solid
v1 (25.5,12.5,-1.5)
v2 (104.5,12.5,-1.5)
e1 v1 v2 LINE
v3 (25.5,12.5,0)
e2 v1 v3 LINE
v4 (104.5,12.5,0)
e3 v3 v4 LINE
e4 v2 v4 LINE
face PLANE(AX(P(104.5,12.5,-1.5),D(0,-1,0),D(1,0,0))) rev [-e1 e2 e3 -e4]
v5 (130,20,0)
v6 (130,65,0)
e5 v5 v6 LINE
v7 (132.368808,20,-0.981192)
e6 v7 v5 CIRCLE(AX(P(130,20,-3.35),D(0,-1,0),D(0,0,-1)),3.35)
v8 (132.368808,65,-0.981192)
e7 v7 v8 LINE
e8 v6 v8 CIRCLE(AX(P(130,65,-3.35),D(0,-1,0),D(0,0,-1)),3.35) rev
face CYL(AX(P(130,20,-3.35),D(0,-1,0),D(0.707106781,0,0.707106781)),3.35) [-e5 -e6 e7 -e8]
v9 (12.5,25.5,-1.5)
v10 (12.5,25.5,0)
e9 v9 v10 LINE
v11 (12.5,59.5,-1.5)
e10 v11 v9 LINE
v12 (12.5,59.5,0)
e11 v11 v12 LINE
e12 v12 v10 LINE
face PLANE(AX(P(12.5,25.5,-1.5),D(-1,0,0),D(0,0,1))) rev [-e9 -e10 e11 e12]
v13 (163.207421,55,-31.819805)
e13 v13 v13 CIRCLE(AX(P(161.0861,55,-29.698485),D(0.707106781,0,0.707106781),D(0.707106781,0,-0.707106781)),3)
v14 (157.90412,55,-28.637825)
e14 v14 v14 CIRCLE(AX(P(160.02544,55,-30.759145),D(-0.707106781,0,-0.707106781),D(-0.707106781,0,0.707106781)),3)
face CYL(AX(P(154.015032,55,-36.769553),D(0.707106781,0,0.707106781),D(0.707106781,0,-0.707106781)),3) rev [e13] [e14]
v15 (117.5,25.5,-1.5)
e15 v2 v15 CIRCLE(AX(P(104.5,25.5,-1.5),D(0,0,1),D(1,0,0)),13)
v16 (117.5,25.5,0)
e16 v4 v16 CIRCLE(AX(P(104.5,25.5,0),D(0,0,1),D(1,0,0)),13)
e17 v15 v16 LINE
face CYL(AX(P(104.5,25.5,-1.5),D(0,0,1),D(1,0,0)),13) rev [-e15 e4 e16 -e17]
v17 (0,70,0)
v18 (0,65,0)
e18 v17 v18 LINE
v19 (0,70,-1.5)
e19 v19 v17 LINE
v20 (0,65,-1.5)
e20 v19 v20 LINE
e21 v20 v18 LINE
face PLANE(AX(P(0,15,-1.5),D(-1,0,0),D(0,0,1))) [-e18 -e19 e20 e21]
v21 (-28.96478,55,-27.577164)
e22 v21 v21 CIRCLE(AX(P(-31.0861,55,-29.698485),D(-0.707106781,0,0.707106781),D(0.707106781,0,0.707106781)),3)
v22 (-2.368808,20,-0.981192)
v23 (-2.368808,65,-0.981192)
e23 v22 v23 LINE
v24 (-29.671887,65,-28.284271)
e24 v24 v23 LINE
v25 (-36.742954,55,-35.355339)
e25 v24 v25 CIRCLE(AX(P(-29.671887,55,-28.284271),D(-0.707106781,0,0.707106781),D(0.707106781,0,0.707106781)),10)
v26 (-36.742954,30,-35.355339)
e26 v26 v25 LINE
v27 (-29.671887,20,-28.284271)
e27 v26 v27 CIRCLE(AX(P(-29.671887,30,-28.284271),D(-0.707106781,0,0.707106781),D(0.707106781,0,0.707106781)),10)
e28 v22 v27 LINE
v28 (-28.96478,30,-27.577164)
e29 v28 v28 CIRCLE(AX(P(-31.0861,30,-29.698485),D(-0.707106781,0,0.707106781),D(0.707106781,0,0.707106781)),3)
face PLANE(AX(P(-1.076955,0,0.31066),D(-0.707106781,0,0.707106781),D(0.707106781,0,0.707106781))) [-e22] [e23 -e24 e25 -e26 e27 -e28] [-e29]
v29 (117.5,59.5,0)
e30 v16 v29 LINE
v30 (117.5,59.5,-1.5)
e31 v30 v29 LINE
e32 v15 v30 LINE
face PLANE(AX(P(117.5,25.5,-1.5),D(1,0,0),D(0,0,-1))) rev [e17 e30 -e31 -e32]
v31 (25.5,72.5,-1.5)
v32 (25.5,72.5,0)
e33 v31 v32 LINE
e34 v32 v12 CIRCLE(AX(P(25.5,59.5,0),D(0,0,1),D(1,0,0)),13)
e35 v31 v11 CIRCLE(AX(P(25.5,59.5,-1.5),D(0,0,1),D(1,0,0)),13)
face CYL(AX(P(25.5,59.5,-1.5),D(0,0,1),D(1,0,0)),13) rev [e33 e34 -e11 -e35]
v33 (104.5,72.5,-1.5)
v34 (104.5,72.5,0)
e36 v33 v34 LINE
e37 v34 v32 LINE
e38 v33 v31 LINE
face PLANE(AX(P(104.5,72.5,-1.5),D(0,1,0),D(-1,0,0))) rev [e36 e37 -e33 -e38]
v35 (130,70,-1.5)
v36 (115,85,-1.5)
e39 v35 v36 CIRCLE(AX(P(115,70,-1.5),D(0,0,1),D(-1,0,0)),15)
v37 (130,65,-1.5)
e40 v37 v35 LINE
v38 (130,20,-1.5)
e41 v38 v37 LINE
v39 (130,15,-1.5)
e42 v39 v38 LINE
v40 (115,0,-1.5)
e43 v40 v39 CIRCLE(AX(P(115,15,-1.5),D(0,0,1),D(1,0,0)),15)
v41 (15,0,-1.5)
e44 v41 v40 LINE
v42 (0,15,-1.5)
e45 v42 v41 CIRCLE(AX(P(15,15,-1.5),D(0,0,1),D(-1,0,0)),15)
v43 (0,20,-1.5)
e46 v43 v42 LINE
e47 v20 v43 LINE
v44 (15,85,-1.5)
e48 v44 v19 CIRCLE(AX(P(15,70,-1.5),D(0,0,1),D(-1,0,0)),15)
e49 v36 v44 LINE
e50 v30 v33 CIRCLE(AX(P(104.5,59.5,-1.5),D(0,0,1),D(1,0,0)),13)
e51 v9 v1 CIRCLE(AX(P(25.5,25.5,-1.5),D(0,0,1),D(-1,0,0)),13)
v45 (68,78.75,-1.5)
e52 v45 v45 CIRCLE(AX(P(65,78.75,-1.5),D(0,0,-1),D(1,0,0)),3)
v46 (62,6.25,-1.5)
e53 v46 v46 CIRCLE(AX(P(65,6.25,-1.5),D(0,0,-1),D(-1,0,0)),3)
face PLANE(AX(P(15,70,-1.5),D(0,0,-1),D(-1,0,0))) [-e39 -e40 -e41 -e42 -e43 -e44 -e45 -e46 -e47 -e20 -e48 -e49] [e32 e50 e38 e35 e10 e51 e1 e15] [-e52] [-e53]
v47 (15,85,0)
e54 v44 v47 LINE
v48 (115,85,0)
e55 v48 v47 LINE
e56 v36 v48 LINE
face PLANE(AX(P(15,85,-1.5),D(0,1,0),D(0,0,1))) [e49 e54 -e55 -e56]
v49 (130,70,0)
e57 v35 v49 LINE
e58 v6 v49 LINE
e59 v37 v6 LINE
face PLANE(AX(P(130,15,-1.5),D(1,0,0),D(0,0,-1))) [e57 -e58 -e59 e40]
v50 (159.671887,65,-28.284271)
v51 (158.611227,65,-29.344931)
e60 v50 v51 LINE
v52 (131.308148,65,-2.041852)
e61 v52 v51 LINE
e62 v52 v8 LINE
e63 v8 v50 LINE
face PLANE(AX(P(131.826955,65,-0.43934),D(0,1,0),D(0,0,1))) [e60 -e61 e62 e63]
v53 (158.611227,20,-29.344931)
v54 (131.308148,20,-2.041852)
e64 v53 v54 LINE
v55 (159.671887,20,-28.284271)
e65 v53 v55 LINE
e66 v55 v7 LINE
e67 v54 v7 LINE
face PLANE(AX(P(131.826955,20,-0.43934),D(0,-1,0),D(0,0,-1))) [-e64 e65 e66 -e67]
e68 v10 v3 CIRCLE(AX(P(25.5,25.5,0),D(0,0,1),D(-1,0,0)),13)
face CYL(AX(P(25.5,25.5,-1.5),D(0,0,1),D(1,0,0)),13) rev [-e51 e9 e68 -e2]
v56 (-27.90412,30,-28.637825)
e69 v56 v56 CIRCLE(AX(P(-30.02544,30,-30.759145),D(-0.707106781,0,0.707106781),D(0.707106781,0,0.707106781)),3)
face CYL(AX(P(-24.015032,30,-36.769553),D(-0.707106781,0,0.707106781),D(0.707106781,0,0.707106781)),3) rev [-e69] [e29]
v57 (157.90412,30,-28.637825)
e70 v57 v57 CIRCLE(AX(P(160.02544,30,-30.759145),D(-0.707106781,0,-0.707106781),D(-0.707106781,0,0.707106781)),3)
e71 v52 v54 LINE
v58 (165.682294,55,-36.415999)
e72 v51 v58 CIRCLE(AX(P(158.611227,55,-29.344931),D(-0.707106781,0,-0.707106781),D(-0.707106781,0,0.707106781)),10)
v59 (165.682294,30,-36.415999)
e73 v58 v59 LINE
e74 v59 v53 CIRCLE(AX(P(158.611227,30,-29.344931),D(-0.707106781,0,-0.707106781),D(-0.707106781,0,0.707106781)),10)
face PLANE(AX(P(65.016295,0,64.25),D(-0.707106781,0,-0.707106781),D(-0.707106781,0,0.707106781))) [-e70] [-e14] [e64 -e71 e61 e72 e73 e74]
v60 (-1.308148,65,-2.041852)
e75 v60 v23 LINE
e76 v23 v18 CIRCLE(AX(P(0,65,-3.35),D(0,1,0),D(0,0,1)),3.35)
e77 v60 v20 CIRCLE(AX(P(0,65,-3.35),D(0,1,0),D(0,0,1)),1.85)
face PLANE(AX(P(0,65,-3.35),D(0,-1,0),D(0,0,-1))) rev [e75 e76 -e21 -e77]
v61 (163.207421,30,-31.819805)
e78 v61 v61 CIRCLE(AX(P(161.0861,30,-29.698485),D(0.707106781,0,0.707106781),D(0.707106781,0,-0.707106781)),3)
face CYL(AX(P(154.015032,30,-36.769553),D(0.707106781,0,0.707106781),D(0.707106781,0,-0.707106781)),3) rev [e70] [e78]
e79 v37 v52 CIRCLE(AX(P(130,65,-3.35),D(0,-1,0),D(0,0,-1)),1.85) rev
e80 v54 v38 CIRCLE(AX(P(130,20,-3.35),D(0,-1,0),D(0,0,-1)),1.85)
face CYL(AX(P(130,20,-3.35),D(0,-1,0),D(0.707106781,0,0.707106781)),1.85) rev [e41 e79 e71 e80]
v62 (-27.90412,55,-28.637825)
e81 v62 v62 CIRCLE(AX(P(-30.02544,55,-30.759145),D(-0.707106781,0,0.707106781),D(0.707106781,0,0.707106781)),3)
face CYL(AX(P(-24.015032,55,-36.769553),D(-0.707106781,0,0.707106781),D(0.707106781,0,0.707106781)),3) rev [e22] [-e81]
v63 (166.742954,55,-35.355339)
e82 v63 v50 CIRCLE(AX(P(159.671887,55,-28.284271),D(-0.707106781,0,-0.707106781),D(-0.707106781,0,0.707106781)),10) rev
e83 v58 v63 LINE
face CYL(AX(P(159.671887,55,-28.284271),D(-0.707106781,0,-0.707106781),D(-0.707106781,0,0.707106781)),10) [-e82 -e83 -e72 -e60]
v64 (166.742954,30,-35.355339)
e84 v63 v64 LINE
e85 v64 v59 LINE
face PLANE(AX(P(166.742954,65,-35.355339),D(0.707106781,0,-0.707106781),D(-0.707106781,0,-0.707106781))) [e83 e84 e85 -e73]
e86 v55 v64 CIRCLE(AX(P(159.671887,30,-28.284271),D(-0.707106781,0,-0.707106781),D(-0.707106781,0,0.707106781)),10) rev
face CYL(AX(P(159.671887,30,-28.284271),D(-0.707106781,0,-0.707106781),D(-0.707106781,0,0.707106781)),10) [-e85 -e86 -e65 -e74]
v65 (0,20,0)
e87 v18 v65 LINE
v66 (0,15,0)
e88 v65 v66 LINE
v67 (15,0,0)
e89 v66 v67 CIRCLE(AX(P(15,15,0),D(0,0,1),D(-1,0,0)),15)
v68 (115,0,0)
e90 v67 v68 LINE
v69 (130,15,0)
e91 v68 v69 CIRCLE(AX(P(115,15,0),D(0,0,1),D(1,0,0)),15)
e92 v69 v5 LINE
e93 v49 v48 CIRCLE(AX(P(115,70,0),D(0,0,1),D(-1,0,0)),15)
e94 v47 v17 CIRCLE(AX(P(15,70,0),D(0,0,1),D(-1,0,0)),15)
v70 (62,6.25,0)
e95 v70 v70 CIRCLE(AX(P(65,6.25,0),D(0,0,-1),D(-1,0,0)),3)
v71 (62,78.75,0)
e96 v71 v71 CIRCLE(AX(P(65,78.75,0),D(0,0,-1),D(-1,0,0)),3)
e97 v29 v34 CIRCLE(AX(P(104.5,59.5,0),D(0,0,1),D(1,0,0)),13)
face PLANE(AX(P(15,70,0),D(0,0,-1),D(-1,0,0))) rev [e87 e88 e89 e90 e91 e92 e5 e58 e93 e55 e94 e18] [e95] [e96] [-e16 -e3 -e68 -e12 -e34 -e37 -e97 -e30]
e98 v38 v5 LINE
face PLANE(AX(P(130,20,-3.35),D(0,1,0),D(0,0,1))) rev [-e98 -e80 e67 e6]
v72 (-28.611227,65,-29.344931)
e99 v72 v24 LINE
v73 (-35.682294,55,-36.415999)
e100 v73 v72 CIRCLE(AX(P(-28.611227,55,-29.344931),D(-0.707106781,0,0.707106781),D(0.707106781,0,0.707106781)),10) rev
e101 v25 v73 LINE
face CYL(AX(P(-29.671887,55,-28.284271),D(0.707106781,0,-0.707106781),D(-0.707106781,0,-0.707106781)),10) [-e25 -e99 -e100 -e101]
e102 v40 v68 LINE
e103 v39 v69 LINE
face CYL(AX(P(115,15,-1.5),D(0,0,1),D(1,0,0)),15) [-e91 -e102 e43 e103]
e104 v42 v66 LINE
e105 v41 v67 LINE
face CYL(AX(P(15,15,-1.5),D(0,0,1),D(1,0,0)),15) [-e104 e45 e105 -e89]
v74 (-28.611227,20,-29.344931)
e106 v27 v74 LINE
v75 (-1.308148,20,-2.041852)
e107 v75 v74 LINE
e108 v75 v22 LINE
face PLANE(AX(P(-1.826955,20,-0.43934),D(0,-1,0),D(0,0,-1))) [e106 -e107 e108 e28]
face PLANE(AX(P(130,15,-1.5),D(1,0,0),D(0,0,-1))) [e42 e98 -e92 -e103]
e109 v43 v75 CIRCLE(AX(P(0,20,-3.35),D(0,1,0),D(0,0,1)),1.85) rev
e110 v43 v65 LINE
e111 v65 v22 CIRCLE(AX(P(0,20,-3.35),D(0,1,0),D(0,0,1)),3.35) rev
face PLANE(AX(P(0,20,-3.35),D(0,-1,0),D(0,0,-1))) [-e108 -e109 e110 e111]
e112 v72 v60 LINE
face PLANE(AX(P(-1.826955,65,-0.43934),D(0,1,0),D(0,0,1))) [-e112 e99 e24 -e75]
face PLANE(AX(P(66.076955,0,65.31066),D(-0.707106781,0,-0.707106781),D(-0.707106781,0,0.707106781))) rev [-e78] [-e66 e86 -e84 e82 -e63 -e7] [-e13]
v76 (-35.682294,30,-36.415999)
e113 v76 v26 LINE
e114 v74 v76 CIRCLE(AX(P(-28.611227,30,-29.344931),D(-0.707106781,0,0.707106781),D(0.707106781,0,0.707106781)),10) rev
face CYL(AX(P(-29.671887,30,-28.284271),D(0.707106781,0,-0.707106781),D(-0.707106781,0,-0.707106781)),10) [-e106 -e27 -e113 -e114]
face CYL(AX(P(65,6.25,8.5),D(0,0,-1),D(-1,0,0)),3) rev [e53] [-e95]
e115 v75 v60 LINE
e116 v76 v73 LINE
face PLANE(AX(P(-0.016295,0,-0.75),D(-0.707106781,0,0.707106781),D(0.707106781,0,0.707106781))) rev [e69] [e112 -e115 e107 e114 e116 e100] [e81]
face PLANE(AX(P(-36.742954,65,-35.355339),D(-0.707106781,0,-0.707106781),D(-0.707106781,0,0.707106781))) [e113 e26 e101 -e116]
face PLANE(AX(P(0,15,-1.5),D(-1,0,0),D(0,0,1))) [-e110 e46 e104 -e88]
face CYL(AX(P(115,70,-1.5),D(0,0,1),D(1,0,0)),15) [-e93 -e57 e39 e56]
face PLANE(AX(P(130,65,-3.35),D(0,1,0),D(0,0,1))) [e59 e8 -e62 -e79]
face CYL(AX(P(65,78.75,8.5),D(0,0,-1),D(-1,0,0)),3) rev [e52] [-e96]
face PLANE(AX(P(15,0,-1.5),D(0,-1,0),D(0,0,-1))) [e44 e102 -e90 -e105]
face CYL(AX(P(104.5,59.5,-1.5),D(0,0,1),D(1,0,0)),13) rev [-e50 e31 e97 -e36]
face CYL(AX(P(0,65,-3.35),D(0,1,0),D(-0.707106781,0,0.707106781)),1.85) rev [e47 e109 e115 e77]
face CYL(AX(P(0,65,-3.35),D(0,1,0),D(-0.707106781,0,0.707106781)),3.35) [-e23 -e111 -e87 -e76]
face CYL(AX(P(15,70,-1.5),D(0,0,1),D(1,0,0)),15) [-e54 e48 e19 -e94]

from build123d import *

# Parameters (mm, degrees)
BASE_FLANGE1_DEPTH          = 1.5
SM_EDGE_FLANGE_1_DEPTH      = 45
SM_EDGE_FLANGE_1_BEND_DEPTH = 45
SKETCH12_R                  = 3
CUT_EXTRUDE1_DEPTH          = 10
FILLET1_R                   = 10
SKETCH13_R                  = 3
CUT_EXTRUDE2_DEPTH          = 10
SKETCH14_R                  = 3
CUT_EXTRUDE3_DEPTH          = 10


# Sheet-metal steps are written as plain solids
with BuildPart() as part:
    # Sketch1 → Base-Flange1 (new body)
    with BuildSketch(Plane.XY):
        with BuildLine():
            Line((15, 0), (115, 0))
            ThreePointArc((115, 0), (125.606601718, 4.393398282), (130, 15))
            Line((130, 15), (130, 70))
            ThreePointArc((130, 70), (125.606601718, 80.606601718), (115, 85))
            Line((115, 85), (15, 85))
            ThreePointArc((15, 85), (4.393398282, 80.606601718), (0, 70))
            Line((0, 70), (0, 15))
            ThreePointArc((0, 15), (4.393398282, 4.393398282), (15, 0))
        make_face()
        with BuildLine():
            Line((104.5, 12.5), (25.5, 12.5))
            ThreePointArc((25.5, 12.5), (16.307611845, 16.307611845), (12.5, 25.5))
            Line((12.5, 25.5), (12.5, 59.5))
            ThreePointArc((12.5, 59.5), (16.307611845, 68.692388155), (25.5, 72.5))
            Line((25.5, 72.5), (104.5, 72.5))
            ThreePointArc((104.5, 72.5), (113.692388155, 68.692388155), (117.5, 59.5))
            Line((117.5, 59.5), (117.5, 25.5))
            ThreePointArc((117.5, 25.5), (113.692388155, 16.307611845), (104.5, 12.5))
        make_face(mode=Mode.SUBTRACT)
    extrude(amount=-BASE_FLANGE1_DEPTH)

    # Ребро-кромка1 section (across the edge) → Ребро-кромка1 (add)
    with BuildSketch(Plane(origin=(-0.76629509, 20, -1.5), x_dir=(0.7071067811865438, 0, -0.7071067811865512), z_dir=(0, 1, 0))):
        with BuildLine():
            Line((-1.5, 0.76629509), (-1.5, 49.378679656))
            Line((-1.5, 49.378679656), (0, 49.378679656))
            Line((0, 49.378679656), (0, 0.76629509))
            ThreePointArc((0, 0.76629509), (0.140822865, 0.058330741), (0.541852455, -0.541852455))
            Line((0.541852455, -0.541852455), (-0.518807717, -1.602512627))
            ThreePointArc((-0.518807717, -1.602512627), (-1.244996434, -0.515694408), (-1.5, 0.76629509))
        make_face()
    extrude(amount=SM_EDGE_FLANGE_1_DEPTH)

    # Ребро-кромка1 section 2 (across the edge) → Ребро-кромка1 bend (add)
    with BuildSketch(Plane(origin=(130.76629509, 65, -1.5), x_dir=(-0.7071067811865438, 0, -0.7071067811865512), z_dir=(0, -1, 0))):
        with BuildLine():
            Line((-1.5, 0.76629509), (-1.5, 49.378679656))
            Line((-1.5, 49.378679656), (0, 49.378679656))
            Line((0, 49.378679656), (0, 0.76629509))
            ThreePointArc((0, 0.76629509), (0.140822865, 0.058330741), (0.541852455, -0.541852455))
            Line((0.541852455, -0.541852455), (-0.518807717, -1.602512627))
            ThreePointArc((-0.518807717, -1.602512627), (-1.244996434, -0.515694408), (-1.5, 0.76629509))
        make_face()
    extrude(amount=SM_EDGE_FLANGE_1_BEND_DEPTH)

    # Sketch12 → Cut-Extrude1 (cut)
    with BuildSketch(Plane(origin=(65.693807717, 0, 65.693807717), x_dir=(0.7071067811865511, 0, -0.707106781186544), z_dir=(0.707106781186544, 0, 0.7071067811865511))):
        with Locations((134.905073837, 30)):
            Circle(SKETCH12_R)
        with Locations((134.905073837, 55)):
            Circle(SKETCH12_R)
    extrude(amount=-CUT_EXTRUDE1_DEPTH, mode=Mode.SUBTRACT)

    # Fillet1
    fillet1_edges = [part.edges().sort_by_distance(p)[0] for p in [
        (-36.212624407, 20, -35.885669145),
        (-36.212624407, 65, -35.885669145),
        (166.212624407, 65, -35.885669145),
        (166.212624407, 20, -35.885669145),
    ]]
    fillet(fillet1_edges, radius=FILLET1_R)

    # Sketch13 → Cut-Extrude2 (cut)
    with BuildSketch(Plane(origin=(-0.693807717, 0, 0.693807717), x_dir=(0.7071067811865511, 0, 0.707106781186544), z_dir=(-0.707106781186544, 0, 0.7071067811865511))):
        with Locations((-42.981192283, 30)):
            Circle(SKETCH13_R)
        with Locations((-42.981192283, 55)):
            Circle(SKETCH13_R)
    extrude(amount=-CUT_EXTRUDE2_DEPTH, mode=Mode.SUBTRACT)

    # Sketch14 → Cut-Extrude3 (cut)
    with BuildSketch(Plane(origin=(0, 0, -1.5), x_dir=(-1, 0, 0), z_dir=(0, 0, -1))):
        with Locations((-65, 6.25)):
            Circle(SKETCH14_R)
        with Locations((-65, 78.75)):
            Circle(SKETCH14_R)
    extrude(amount=-CUT_EXTRUDE3_DEPTH, mode=Mode.SUBTRACT)


solid = part.part
